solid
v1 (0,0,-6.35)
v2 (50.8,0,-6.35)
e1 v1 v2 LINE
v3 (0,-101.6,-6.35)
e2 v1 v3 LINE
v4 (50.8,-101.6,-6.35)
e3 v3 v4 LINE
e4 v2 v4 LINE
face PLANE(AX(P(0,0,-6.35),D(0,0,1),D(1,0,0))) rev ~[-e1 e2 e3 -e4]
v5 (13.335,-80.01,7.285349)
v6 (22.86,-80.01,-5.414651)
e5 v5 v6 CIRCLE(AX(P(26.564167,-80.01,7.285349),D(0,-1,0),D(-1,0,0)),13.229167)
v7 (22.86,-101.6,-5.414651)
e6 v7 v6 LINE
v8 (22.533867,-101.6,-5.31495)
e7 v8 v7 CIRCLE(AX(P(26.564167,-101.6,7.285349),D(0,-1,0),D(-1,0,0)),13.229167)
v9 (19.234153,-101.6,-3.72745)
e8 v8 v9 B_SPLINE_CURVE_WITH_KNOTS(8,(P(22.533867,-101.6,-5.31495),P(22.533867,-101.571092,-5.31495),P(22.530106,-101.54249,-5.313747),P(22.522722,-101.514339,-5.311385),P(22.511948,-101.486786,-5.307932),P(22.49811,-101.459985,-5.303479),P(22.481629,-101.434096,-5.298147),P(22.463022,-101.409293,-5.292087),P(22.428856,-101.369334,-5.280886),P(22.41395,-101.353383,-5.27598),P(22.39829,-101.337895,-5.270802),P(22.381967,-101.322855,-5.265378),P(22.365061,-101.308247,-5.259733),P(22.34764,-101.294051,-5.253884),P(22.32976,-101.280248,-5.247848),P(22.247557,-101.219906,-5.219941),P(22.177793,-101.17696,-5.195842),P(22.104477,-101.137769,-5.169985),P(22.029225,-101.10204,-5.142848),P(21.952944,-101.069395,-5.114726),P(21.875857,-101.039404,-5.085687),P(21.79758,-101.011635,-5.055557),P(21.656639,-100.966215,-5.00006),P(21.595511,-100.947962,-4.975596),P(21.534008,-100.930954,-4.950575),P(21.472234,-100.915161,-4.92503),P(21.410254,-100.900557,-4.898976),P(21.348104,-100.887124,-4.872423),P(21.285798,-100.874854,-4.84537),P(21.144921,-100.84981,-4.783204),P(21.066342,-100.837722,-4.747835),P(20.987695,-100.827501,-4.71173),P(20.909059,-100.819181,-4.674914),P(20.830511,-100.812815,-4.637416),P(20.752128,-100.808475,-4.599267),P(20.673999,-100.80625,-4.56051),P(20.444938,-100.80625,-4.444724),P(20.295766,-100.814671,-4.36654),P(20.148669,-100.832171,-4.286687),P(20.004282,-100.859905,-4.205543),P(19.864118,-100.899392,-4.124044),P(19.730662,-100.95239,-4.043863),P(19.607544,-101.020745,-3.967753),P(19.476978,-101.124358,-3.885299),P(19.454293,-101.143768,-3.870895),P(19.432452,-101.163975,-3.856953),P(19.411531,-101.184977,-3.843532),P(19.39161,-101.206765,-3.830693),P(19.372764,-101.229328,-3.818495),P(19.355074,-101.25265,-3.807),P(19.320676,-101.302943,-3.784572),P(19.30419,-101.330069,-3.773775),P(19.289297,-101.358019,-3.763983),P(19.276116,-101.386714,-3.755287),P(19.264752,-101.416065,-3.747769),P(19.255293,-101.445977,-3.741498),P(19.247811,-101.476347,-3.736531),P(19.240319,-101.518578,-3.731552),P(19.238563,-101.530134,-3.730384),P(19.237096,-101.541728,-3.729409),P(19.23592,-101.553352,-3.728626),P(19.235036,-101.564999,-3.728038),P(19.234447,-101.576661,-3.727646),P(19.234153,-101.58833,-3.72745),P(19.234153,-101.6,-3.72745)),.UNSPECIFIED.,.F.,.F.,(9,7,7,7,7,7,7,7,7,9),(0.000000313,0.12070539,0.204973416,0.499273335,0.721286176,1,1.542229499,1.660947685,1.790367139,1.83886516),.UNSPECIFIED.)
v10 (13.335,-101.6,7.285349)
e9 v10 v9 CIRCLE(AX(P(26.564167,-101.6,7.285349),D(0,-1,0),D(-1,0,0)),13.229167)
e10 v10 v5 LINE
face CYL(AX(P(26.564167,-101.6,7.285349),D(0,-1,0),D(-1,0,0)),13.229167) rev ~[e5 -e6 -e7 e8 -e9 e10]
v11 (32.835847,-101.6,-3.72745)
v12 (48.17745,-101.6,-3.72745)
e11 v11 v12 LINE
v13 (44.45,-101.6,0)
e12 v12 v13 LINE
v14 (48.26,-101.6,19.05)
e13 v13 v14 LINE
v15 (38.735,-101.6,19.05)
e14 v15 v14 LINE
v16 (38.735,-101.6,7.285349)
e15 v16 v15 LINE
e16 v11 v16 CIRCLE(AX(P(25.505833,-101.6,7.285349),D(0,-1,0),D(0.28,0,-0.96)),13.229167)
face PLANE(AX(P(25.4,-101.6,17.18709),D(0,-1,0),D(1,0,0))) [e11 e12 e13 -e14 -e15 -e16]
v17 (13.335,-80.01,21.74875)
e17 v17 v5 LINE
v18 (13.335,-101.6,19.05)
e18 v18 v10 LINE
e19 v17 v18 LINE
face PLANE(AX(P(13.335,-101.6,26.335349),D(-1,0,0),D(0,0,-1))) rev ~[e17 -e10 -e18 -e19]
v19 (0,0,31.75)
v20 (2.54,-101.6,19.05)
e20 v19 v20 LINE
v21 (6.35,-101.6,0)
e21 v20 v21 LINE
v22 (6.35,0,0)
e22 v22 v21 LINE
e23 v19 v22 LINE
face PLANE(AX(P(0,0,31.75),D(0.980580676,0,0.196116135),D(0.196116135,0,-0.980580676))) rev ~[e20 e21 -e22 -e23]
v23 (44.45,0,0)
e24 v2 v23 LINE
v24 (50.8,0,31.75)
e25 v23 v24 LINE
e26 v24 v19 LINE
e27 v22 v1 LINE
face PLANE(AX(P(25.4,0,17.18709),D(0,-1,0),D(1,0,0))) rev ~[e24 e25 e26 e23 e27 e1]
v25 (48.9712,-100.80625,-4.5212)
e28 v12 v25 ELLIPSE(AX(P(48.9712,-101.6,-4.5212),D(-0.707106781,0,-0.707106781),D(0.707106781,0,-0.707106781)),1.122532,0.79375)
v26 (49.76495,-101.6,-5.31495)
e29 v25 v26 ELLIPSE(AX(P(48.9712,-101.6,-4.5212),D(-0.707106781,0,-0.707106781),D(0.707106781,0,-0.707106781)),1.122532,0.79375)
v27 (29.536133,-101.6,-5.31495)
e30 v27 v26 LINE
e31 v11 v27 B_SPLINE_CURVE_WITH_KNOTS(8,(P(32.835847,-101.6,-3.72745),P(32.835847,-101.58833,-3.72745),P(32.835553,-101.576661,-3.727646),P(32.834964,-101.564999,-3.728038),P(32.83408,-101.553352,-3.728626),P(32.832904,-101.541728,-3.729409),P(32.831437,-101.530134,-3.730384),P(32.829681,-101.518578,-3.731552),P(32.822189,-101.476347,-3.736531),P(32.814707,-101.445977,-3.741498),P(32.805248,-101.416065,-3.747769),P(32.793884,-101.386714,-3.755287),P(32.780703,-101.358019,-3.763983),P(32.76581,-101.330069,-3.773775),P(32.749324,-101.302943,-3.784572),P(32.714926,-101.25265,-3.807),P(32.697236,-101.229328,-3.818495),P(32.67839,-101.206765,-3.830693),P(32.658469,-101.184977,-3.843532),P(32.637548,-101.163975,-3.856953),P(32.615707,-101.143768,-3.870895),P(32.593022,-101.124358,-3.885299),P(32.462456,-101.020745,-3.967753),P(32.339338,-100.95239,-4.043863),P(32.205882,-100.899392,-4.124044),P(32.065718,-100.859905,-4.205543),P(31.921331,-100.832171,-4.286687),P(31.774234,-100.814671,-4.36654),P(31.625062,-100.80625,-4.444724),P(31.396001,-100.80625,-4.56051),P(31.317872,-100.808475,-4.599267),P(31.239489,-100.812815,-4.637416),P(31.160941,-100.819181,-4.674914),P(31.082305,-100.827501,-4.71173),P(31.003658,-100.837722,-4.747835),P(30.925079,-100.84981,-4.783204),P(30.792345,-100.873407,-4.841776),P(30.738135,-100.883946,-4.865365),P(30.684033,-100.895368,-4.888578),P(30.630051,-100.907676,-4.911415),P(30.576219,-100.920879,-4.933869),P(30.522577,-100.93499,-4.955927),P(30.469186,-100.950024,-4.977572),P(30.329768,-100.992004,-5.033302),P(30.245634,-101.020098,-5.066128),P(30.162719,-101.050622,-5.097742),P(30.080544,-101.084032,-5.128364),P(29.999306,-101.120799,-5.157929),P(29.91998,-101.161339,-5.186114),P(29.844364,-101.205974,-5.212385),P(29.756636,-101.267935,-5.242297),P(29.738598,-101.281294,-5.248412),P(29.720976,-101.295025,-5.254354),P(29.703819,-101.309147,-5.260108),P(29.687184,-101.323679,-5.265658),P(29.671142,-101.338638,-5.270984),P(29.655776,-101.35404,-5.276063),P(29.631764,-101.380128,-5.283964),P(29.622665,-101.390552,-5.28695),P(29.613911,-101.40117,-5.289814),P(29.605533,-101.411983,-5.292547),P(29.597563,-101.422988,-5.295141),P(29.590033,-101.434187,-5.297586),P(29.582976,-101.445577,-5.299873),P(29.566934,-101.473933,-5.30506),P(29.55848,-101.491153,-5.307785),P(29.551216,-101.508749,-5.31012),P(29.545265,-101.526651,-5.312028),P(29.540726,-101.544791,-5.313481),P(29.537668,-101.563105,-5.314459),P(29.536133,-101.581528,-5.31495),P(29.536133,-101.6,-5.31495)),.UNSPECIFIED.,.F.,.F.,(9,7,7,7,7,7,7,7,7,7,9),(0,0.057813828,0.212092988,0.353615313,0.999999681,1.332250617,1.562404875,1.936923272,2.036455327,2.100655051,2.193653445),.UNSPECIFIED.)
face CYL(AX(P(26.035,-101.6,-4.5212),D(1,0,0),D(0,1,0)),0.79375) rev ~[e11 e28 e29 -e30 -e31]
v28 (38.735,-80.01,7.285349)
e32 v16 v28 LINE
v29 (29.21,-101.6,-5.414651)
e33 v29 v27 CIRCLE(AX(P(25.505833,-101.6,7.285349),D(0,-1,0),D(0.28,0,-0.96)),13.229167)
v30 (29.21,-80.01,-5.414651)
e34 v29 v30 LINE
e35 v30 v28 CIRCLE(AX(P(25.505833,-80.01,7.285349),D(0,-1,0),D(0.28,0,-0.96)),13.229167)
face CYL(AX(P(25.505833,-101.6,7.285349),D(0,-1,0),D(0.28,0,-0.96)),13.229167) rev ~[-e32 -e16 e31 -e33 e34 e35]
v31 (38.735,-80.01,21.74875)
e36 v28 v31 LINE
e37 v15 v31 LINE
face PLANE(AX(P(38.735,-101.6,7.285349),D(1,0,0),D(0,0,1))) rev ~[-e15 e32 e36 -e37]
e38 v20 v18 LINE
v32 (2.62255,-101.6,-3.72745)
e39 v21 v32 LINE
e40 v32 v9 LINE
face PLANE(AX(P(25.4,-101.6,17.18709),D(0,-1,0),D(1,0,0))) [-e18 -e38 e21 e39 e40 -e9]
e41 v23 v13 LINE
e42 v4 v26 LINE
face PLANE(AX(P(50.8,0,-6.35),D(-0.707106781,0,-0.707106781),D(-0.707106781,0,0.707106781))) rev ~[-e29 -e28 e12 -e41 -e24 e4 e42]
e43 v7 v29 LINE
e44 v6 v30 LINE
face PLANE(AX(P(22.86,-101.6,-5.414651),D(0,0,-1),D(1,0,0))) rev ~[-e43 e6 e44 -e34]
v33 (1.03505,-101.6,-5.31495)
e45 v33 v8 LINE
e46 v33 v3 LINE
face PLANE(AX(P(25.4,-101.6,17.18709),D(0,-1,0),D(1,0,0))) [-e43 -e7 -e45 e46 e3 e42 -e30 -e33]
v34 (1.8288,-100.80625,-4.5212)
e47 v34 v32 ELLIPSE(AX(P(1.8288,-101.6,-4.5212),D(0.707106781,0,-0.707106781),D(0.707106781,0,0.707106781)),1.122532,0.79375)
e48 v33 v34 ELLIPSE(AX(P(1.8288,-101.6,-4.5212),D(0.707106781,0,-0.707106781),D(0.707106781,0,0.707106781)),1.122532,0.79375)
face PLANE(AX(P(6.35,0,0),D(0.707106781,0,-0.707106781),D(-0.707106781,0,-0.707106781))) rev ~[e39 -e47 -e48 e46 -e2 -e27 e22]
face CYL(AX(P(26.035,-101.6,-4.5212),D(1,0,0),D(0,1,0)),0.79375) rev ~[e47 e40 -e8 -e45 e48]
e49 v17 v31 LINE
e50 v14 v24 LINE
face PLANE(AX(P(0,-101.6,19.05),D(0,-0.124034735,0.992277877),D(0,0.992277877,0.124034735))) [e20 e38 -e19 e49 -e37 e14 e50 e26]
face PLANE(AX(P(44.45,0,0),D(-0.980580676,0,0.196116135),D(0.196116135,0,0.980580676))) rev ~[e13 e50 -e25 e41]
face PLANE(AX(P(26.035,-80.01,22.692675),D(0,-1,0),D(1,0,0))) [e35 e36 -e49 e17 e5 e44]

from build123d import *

# Parameters (mm, degrees)
F1_DEPTH = 101.6
F3_DEPTH = 50.8
F4_W     = 25.4
F4_H     = 7.2853491507
F5_DEPTH = 21.59
F7_R     = 0.79375
F8_DEPTH = 25.4


# Not quite as in the source:
# - a feature names something its author has since deleted; it is built from what else it names


with BuildPart() as f1:
    # F0 (on Front) → F1 (new body)
    with BuildSketch(Plane.XZ):
        Polygon((50.8, 31.75), (0, 31.75), (6.35, 0), (44.45, 0), align=None)
        Polygon((44.45, 0), (6.35, 0), (0, -6.35), (50.8, -6.35), align=None)
    extrude(amount=F1_DEPTH)

    # F2 (on Right) → F3 (cut)
    with BuildSketch(Plane.YZ):
        Polygon((-101.6, 31.75), (-101.6, 19.05), (0, 31.75), align=None)
    extrude(amount=F3_DEPTH, mode=Mode.SUBTRACT)

    # F4 (on face) → F5 (cut)
    with BuildSketch(Plane.XZ.offset(101.6)):
        with Locations((26.035, 22.6926745754)):
            Rectangle(F4_W, F4_H)
        with BuildLine():
            Line((13.335, 19.05), (13.335, 7.2853491507))
            ThreePointArc((13.335, 7.2853491507), (15.9808333333, -0.6521508493), (22.86, -5.4146508493))
            Line((22.86, -5.4146508493), (29.21, -5.4146508493))
            ThreePointArc((29.21, -5.4146508493), (36.0891666667, -0.6521508493), (38.735, 7.2853491507))
            Line((38.735, 7.2853491507), (38.735, 19.05))
            Line((38.735, 19.05), (13.335, 19.05))
        make_face()
    extrude(amount=-F5_DEPTH, mode=Mode.SUBTRACT)

    # F7 (on offset) → F8 (cut, symmetric)
    with BuildSketch(Plane.YZ.offset(26.035)):
        with Locations((-101.6, -4.5212)):
            Circle(F7_R)
    extrude(amount=F8_DEPTH, both=True, mode=Mode.SUBTRACT)


solid = f1.part
